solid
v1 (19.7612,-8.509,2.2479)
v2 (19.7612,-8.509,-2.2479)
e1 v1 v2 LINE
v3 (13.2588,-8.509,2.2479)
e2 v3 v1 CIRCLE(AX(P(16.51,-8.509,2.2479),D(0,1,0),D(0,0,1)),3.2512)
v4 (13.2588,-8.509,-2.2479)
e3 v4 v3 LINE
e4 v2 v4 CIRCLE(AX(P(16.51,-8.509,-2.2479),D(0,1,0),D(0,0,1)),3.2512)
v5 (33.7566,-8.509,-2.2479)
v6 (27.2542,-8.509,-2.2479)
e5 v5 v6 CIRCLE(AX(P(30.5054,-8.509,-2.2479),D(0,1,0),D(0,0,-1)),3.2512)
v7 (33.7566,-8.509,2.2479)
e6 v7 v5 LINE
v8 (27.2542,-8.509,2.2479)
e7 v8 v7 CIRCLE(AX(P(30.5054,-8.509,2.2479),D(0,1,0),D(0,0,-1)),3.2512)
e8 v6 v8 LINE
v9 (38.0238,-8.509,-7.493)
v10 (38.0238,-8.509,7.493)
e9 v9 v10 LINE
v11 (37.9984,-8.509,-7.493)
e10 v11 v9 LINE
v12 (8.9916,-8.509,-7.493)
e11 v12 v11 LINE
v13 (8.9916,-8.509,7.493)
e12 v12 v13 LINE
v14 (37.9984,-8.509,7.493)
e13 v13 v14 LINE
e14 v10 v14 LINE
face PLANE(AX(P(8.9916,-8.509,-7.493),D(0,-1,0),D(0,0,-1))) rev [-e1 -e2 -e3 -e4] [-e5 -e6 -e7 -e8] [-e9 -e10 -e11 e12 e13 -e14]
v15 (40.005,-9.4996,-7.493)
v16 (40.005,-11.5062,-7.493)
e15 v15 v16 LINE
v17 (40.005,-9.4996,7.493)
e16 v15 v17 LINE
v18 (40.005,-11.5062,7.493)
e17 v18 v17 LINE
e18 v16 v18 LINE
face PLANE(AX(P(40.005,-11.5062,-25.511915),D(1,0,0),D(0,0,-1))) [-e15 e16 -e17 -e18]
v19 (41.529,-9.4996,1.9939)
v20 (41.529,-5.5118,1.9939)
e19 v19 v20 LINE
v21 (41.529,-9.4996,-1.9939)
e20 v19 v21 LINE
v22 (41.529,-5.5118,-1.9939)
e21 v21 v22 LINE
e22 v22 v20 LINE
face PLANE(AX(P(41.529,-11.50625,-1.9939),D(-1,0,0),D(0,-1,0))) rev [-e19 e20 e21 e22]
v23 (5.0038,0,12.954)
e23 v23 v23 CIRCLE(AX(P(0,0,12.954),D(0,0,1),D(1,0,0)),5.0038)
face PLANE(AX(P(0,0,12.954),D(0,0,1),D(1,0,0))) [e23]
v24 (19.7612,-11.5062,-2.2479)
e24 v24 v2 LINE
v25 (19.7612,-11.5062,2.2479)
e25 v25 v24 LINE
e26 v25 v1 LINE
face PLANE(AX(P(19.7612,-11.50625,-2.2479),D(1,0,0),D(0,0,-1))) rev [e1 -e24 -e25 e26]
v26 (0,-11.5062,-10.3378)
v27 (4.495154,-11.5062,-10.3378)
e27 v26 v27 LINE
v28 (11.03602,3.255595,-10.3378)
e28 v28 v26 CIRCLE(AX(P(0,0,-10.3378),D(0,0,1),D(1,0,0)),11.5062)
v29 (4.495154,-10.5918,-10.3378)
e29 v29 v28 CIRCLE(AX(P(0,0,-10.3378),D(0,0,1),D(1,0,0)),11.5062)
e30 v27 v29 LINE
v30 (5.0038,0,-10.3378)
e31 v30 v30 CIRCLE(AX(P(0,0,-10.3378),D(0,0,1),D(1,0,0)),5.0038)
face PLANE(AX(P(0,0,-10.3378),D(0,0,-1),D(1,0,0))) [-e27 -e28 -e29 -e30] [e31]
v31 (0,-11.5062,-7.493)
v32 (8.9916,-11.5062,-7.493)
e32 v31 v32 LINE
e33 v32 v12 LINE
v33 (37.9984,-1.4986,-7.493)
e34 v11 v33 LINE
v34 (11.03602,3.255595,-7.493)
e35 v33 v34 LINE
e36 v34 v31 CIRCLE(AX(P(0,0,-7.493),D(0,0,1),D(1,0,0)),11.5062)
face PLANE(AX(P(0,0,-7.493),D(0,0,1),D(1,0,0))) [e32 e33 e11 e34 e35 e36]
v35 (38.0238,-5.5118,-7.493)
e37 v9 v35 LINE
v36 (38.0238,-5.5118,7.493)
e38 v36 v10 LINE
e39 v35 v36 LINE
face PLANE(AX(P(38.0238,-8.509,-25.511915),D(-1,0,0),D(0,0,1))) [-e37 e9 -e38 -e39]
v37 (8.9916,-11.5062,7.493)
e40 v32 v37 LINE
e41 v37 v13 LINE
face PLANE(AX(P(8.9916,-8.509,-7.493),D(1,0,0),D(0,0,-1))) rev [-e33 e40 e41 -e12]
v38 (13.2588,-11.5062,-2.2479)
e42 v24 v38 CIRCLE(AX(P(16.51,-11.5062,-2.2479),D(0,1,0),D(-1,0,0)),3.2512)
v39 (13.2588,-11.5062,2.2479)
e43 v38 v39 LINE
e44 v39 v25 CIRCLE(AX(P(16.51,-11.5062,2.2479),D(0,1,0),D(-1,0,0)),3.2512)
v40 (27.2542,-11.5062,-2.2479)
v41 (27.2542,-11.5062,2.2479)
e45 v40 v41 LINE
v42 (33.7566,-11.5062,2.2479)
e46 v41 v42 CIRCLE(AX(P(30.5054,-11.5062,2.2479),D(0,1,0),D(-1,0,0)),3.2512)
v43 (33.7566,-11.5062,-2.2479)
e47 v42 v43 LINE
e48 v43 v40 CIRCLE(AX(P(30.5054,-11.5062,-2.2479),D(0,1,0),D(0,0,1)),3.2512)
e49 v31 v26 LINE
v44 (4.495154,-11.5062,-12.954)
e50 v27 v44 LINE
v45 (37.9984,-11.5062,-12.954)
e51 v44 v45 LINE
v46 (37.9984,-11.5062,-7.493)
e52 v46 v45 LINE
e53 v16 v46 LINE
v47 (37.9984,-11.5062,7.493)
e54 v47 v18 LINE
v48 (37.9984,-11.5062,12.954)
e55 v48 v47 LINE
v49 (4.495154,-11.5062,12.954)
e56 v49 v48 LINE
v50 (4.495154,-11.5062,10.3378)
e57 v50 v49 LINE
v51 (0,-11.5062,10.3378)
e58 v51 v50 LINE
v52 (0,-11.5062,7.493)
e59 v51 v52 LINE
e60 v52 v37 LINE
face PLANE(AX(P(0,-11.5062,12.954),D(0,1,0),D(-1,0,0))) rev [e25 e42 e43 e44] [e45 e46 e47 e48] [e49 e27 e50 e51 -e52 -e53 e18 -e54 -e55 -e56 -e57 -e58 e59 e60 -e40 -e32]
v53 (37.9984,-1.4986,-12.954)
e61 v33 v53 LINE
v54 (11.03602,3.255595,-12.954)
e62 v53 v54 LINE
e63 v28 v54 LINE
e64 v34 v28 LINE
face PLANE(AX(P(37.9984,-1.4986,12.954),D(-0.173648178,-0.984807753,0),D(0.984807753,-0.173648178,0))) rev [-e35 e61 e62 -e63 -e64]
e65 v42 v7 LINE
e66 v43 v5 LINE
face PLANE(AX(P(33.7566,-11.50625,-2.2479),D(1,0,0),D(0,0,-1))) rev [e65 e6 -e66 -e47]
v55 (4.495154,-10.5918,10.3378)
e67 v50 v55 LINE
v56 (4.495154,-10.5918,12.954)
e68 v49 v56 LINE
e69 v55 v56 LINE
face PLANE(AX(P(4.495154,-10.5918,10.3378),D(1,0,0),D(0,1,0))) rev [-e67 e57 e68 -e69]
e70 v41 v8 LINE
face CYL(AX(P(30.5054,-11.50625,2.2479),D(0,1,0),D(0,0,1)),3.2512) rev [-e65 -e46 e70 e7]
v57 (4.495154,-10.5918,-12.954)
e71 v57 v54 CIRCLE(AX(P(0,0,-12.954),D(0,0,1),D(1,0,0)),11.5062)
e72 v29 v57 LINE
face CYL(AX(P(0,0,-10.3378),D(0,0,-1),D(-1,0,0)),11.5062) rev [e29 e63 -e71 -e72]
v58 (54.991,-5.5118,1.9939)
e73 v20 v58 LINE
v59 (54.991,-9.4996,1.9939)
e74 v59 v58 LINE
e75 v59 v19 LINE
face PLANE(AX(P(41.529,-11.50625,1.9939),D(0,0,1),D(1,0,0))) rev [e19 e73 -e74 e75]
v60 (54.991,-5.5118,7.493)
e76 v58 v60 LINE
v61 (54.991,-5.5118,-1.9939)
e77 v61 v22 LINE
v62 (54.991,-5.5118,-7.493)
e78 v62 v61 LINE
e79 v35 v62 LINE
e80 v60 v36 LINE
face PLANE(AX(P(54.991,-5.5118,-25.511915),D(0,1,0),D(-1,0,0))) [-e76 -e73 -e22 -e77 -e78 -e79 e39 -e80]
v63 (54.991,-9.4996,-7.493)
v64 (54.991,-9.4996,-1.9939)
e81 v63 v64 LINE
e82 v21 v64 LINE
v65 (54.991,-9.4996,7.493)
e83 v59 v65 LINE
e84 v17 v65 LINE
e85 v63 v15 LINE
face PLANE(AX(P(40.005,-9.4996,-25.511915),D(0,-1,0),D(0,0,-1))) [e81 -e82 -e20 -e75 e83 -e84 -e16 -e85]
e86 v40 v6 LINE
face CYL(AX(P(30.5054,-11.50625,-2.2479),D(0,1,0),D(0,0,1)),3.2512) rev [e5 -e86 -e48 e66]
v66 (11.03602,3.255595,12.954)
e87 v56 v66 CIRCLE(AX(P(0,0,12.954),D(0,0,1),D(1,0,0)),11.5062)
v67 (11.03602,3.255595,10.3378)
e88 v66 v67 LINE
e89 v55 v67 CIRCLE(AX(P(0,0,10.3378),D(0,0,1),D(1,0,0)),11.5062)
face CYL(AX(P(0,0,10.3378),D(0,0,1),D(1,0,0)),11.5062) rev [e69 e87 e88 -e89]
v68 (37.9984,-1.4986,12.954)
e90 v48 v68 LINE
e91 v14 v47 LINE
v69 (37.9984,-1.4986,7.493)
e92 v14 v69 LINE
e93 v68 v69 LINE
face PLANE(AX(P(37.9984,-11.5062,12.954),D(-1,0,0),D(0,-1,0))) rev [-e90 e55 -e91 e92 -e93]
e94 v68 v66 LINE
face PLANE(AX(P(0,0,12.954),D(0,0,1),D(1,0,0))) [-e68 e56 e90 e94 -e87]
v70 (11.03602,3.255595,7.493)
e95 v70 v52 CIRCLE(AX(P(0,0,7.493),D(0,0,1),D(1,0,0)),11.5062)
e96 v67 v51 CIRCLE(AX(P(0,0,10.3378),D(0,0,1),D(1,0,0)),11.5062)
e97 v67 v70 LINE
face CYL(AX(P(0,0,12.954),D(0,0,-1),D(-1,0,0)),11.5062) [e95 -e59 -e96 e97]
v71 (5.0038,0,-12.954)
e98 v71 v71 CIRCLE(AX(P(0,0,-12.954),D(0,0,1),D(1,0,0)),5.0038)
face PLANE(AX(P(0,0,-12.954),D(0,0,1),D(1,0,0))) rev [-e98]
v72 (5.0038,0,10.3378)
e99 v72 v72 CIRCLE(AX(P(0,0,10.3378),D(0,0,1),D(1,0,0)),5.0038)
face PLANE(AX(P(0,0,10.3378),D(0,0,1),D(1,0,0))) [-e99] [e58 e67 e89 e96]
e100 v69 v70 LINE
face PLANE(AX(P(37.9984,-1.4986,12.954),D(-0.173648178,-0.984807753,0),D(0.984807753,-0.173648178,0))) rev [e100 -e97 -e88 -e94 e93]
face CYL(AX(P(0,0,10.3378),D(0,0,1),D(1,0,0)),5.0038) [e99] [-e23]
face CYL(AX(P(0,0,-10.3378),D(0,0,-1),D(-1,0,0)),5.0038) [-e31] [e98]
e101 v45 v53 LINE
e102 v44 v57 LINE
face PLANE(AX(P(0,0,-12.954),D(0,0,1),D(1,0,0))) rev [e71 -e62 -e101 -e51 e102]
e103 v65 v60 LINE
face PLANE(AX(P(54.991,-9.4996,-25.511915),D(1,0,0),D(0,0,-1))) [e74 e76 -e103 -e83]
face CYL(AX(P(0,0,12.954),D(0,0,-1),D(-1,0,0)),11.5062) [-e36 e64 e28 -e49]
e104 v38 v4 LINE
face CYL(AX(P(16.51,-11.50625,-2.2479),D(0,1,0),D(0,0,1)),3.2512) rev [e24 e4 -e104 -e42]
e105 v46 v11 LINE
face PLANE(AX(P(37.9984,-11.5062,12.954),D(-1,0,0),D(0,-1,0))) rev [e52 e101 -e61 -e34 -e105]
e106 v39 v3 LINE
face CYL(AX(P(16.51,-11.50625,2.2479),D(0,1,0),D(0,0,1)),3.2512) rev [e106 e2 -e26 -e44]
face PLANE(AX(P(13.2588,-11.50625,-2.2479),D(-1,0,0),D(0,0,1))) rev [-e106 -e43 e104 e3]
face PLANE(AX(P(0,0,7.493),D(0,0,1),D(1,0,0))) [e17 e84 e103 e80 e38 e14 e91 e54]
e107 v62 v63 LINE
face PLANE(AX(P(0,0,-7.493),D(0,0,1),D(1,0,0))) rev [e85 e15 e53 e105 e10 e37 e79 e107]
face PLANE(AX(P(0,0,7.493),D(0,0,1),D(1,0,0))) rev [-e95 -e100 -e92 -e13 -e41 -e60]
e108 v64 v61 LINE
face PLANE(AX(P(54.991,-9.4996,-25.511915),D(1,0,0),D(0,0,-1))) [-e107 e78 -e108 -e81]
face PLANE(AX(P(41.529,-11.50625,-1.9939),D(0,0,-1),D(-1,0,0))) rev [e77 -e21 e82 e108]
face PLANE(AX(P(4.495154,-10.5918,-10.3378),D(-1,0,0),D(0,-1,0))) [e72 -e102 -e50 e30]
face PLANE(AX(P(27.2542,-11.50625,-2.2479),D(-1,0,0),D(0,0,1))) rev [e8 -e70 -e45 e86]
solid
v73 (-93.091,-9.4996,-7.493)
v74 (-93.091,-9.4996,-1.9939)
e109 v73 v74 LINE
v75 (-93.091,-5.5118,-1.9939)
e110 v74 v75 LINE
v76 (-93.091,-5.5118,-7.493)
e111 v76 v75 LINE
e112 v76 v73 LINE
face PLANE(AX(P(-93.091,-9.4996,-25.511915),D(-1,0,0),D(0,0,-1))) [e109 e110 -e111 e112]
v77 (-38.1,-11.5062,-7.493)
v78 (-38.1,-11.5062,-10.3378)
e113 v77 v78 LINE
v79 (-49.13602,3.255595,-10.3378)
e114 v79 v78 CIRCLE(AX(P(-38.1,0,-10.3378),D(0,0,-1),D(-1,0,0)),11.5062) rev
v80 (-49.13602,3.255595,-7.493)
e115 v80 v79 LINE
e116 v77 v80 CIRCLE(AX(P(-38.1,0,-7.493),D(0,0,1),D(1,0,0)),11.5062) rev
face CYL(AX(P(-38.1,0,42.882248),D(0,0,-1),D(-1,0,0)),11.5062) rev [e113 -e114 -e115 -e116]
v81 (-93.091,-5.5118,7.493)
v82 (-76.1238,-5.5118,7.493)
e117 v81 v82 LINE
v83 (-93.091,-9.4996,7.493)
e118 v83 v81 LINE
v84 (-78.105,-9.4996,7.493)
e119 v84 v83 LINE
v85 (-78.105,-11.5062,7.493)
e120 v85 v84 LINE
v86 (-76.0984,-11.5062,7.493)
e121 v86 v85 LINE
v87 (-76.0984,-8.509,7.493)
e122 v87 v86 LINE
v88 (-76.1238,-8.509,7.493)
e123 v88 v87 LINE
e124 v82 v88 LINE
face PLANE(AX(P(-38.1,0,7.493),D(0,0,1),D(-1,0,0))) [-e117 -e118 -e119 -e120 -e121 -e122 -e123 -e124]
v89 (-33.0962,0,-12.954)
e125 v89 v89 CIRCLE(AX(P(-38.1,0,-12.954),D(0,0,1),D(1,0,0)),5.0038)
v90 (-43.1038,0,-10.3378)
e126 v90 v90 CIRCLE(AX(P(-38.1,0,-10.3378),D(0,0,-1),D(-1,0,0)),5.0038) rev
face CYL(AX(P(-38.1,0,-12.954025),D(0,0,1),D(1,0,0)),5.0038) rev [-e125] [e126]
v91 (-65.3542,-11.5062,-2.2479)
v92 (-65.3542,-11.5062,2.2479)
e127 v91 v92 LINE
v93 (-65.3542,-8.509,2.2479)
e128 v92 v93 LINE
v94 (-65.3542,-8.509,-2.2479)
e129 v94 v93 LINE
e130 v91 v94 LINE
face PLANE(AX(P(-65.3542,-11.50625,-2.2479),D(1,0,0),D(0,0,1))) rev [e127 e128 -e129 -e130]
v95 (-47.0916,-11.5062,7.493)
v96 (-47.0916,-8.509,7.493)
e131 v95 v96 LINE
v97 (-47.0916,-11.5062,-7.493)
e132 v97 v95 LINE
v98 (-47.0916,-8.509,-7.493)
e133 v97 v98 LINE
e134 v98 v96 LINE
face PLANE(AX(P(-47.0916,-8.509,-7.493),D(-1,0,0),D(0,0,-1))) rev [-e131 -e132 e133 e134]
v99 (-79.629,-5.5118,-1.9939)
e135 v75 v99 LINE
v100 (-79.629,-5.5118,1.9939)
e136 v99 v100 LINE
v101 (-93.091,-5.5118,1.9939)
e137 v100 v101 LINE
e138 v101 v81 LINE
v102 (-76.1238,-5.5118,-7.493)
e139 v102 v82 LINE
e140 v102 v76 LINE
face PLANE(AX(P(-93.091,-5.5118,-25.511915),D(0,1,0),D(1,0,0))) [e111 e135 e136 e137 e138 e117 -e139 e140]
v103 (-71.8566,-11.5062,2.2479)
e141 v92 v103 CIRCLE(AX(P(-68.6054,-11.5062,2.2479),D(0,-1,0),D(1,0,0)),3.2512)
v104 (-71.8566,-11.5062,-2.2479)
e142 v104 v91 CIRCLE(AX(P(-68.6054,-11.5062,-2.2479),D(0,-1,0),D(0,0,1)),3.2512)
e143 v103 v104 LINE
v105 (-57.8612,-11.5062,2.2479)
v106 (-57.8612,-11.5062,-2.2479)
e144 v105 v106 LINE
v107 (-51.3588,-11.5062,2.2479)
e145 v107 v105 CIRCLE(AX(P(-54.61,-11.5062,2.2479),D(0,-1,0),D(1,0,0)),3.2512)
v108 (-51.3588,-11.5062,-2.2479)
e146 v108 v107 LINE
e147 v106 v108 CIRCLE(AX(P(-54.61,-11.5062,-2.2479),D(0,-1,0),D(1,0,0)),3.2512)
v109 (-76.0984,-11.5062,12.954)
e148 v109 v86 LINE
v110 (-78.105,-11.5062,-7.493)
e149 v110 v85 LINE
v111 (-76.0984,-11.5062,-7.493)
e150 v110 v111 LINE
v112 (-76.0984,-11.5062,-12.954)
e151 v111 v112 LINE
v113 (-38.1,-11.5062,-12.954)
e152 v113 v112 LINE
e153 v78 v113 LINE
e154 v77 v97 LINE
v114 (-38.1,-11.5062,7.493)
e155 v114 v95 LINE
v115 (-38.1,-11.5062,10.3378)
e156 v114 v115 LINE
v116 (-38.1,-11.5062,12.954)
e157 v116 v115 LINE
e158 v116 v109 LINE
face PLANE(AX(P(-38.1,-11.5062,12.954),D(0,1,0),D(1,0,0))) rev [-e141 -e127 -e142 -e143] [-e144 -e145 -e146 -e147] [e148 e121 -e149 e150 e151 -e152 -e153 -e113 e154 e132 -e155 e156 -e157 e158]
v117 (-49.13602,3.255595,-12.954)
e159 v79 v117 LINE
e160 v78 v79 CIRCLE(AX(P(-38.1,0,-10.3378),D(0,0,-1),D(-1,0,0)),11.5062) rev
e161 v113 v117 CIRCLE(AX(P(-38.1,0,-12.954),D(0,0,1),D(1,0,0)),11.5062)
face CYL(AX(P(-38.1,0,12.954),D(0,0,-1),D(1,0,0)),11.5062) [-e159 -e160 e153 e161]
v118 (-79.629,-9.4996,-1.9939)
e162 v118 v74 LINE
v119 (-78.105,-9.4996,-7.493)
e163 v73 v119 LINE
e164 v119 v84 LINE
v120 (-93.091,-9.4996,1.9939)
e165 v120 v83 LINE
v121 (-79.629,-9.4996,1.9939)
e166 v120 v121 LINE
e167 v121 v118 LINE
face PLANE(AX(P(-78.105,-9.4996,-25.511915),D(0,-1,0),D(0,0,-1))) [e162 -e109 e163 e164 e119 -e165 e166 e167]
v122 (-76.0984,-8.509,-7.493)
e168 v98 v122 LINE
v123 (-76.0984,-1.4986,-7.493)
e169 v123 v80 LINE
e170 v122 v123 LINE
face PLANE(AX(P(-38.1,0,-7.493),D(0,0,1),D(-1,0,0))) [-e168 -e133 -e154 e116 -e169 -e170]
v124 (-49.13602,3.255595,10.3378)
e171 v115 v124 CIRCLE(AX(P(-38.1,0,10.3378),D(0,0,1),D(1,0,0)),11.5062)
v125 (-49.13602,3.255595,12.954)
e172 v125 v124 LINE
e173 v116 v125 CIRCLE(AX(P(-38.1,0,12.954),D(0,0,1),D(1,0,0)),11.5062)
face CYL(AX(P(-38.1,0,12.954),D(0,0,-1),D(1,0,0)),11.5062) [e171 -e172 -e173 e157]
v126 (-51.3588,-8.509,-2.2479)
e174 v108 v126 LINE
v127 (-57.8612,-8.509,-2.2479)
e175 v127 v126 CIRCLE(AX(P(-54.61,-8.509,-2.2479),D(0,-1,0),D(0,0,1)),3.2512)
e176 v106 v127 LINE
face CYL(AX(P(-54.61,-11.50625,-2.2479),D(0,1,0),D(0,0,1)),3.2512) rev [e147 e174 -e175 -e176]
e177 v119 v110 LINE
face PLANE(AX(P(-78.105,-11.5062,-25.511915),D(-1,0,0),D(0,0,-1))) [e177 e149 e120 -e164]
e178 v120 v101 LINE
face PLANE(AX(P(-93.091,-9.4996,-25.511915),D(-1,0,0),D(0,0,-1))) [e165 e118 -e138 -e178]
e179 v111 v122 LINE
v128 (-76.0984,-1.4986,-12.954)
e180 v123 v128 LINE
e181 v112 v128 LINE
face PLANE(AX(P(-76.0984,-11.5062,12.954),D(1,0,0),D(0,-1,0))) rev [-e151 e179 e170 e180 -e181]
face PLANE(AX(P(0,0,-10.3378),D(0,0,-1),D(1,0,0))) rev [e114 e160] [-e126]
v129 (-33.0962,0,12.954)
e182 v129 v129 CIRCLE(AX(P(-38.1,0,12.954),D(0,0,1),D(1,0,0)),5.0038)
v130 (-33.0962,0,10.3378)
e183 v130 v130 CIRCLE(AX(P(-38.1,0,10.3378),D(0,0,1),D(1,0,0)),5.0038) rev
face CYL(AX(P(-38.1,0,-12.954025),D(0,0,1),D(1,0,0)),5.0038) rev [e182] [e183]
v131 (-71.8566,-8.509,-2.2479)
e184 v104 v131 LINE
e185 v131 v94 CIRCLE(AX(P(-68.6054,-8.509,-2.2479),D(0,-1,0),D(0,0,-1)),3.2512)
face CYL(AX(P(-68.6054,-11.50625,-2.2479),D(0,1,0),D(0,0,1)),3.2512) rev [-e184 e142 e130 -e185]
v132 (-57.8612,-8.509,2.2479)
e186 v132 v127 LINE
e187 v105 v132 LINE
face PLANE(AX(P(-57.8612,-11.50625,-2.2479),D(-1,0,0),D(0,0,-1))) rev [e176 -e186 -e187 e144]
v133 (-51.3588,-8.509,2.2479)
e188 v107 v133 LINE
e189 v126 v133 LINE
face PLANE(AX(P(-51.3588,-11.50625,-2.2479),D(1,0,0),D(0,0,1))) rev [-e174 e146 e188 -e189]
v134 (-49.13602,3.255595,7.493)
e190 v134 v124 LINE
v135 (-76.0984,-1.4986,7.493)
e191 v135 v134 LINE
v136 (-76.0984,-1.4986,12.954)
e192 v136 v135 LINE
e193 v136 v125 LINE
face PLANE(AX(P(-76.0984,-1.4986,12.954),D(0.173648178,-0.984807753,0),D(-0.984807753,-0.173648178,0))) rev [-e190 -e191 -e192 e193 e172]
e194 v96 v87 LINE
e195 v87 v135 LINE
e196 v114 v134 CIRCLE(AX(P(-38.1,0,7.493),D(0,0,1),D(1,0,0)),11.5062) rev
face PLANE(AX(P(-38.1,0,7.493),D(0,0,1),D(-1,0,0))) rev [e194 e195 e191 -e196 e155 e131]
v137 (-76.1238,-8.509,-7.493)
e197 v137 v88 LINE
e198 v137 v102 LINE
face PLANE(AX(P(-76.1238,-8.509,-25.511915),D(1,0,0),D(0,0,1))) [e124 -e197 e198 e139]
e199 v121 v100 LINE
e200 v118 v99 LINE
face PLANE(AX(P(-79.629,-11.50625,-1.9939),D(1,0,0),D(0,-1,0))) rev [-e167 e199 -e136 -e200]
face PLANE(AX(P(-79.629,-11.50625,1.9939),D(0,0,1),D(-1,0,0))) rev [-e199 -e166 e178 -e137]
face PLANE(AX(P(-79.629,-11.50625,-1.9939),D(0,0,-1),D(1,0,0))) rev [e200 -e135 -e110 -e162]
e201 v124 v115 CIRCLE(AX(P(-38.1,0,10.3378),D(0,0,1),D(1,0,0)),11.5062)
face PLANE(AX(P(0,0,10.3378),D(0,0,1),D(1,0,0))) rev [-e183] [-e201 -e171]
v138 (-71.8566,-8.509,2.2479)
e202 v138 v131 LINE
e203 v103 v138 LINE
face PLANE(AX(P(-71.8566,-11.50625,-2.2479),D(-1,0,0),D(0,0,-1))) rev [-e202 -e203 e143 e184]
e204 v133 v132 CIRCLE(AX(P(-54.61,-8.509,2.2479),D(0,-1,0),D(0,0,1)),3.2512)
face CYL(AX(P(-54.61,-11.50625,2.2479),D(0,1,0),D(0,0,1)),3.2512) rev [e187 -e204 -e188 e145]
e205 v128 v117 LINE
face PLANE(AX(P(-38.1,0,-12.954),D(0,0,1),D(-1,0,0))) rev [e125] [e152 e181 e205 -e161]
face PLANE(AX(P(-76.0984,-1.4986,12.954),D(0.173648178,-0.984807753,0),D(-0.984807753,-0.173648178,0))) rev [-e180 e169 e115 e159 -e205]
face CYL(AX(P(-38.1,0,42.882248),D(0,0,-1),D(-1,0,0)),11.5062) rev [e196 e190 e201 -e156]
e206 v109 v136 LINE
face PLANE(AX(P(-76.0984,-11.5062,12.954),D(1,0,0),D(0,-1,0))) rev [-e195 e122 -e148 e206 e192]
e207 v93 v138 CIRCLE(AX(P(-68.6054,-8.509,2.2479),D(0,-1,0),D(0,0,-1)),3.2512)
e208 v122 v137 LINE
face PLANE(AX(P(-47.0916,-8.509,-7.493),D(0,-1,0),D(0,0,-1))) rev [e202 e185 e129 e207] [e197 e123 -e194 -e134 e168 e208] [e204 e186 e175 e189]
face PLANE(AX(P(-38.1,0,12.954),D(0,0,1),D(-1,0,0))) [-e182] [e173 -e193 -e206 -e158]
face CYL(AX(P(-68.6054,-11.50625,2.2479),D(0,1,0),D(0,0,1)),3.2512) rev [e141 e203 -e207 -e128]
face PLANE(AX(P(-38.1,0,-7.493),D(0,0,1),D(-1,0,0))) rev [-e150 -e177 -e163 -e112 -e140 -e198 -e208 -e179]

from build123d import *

# Parameters (mm, degrees)
EXTRUDE1_DEPTH             = 12.954
SKETCH3_R                  = 5.0038
CUT_EXTRUDE1_DEPTH         = 2.6162
CUT_EXTRUDE2_DEPTH         = 7.493
EXTRUDE2_REACH             = 43.762
EXTRUDE2_DIRECTION_2_REACH = 43.762
SKETCH7_W                  = 13.462
SKETCH7_H                  = 3.9878
CUT_EXTRUDE3_DEPTH         = 60.003631422
CUT_EXTRUDE4_DEPTH         = 60.936836987
EXTRUDE3_OUTLINE_R         = 5.0038
EXTRUDE3_DEPTH             = 2.6162
EXTRUDE4_DEPTH             = 2.6162
SKETCH9_R                  = 5.0038
CUT_EXTRUDE5_DEPTH         = 98.311619982
CUT_EXTRUDE6_START         = -10.3378
SKETCH12_R                 = 11.5062
CUT_EXTRUDE6_DEPTH         = 20.6756


# Read off the part's stored shape, not the designer's step: Extrude3
with BuildPart() as part:
    # Sketch2 → Extrude1 (new, symmetric)
    with BuildSketch(Plane.XY):
        with BuildLine():
            Line((37.9984, -11.5062), (37.9984, -1.4986))
            Line((37.9984, -1.4986), (11.036020087, 3.255595043))
            ThreePointArc((11.036020087, 3.255595043), (-9.215534877, 6.889597621), (0, -11.5062))
            Line((0, -11.5062), (37.9984, -11.5062))
        make_face()
    extrude(amount=EXTRUDE1_DEPTH, both=True)

    # Sketch3 → Cut-Extrude1 (cut)
    with BuildSketch(Plane.XY.offset(12.954)):
        with BuildLine():
            Line((0, -11.5062), (4.495154191, -11.5062))
            Line((4.495154191, -11.5062), (4.495154191, -10.5918))
            ThreePointArc((4.495154191, -10.5918), (-2.293607342, 11.27528287), (0, -11.5062))
        make_face()
        Circle(SKETCH3_R, mode=Mode.SUBTRACT)
    cut_extrude1 = extrude(amount=-CUT_EXTRUDE1_DEPTH, mode=Mode.SUBTRACT)

    # Mirror1: Cut-Extrude1 across plane
    add(cut_extrude1.mirror(Plane.XY), mode=Mode.SUBTRACT)

    # Sketch4 → Cut-Extrude2 (cut, symmetric)
    with BuildSketch(Plane.XY):
        with BuildLine():
            Line((8.9916, -8.509), (37.9984, -8.509))
            Line((37.9984, -8.509), (37.9984, -1.4986))
            Line((37.9984, -1.4986), (11.036020087, 3.255595043))
            ThreePointArc((11.036020087, 3.255595043), (-9.215534877, 6.889597621), (0, -11.5062))
            Line((0, -11.5062), (8.9916, -11.5062))
            Line((8.9916, -11.5062), (8.9916, -8.509))
        make_face()
    extrude(amount=CUT_EXTRUDE2_DEPTH, both=True, mode=Mode.SUBTRACT)

    # Extrude2: up to this face of the body (flat: up to its plane)
    extrude2_end = Plane(part.part.faces().sort_by_distance((8.815484891, -1.610467544, -7.493))[0])
    # Sketch5 → Extrude2 (add, up to the picked face)
    with BuildSketch(Plane.XY, mode=Mode.PRIVATE) as extrude2_sk1:
        Polygon((54.991, -5.5118), (38.0238, -5.5118), (38.0238, -8.509), (37.9984, -8.509), (37.9984, -11.5062), (40.005, -11.5062), (40.005, -9.4996), (54.991, -9.4996), align=None)
    extrude2_tool1 = split(extrude(extrude2_sk1.sketch, amount=-EXTRUDE2_REACH, mode=Mode.PRIVATE), bisect_by=extrude2_end, keep=Keep.BOTH, mode=Mode.PRIVATE)
    add(extrude2_tool1.solids().sort_by(Axis((46.083002, -7.674508, 0), (0, 0, -1)))[0])

    # Extrude2 direction 2: up to this face of the body (flat: up to its plane)
    extrude2_direction_2_end = Plane(part.part.faces().sort_by_distance((8.815484891, -1.610467544, 7.493))[0])
    # Sketch5 → Extrude2 direction 2 (add, up to the picked face)
    with BuildSketch(Plane.XY, mode=Mode.PRIVATE) as extrude2_direction_2_sk1:
        Polygon((54.991, -5.5118), (38.0238, -5.5118), (38.0238, -8.509), (37.9984, -8.509), (37.9984, -11.5062), (40.005, -11.5062), (40.005, -9.4996), (54.991, -9.4996), align=None)
    extrude2_direction_2_tool1 = split(extrude(extrude2_direction_2_sk1.sketch, amount=EXTRUDE2_DIRECTION_2_REACH, mode=Mode.PRIVATE), bisect_by=extrude2_direction_2_end, keep=Keep.BOTH, mode=Mode.PRIVATE)
    add(extrude2_direction_2_tool1.solids().sort_by(Axis((46.083002, -7.674508, 0), (0, 0, 1)))[0])

    # Sketch7 → Cut-Extrude3 (cut, through all)
    with BuildSketch(Plane(origin=(0, -5.5118, 0), x_dir=(1, 0, 0), z_dir=(0, 1, 0))):
        with Locations((48.26, 0)):
            Rectangle(SKETCH7_W, SKETCH7_H)
    extrude(amount=-CUT_EXTRUDE3_DEPTH, mode=Mode.SUBTRACT)

    # Sketch8 → Cut-Extrude4 (cut, through all)
    with BuildSketch(Plane(origin=(0, -8.509, 0), x_dir=(1, 0, 0), z_dir=(0, 1, 0))):
        with BuildLine():
            Line((19.7612, 2.2479), (19.7612, -2.2479))
            ThreePointArc((19.7612, -2.2479), (16.51, -5.4991), (13.2588, -2.2479))
            Line((13.2588, -2.2479), (13.2588, 2.2479))
            ThreePointArc((13.2588, 2.2479), (16.51, 5.4991), (19.7612, 2.2479))
        make_face()
        with BuildLine():
            Line((33.7566, 2.2479), (33.7566, -2.2479))
            ThreePointArc((33.7566, -2.2479), (30.5054, -5.4991), (27.2542, -2.2479))
            Line((27.2542, -2.2479), (27.2542, 2.2479))
            ThreePointArc((27.2542, 2.2479), (30.5054, 5.4991), (33.7566, 2.2479))
        make_face()
    extrude(amount=-CUT_EXTRUDE4_DEPTH, mode=Mode.SUBTRACT)


with BuildPart() as body_2:
    # Mirror3: mirrored copy
    add(part.part.mirror(Plane(origin=(-19.05, 0, 0), x_dir=(0, 0, 1), z_dir=(1, 0, 0))))

    # Extrude3 outline → Extrude3 (add)
    with BuildSketch(Plane.XY.offset(10.3378)):
        with BuildLine():
            ThreePointArc((-38.1, -11.5062), (-28.884465123, 6.889597621), (-49.136020087, 3.255595043))
            ThreePointArc((-49.136020087, 3.255595043), (-48.503938244, -4.91433693), (-42.595154191, -10.5918))
            Line((-42.595154191, -10.5918), (-42.595154191, -11.5062))
            Line((-42.595154191, -11.5062), (-38.1, -11.5062))
        make_face()
        with Locations((-38.1, 0)):
            Circle(EXTRUDE3_OUTLINE_R, mode=Mode.SUBTRACT)
    extrude(amount=EXTRUDE3_DEPTH)

    # Sketch11 → Extrude4 (add)
    with BuildSketch(Plane(origin=(0, 0, -10.3378), x_dir=(-1, 0, 0), z_dir=(0, 0, -1))):
        with BuildLine():
            Line((38.1, -11.5062), (42.595154191, -11.5062))
            Line((42.595154191, -11.5062), (42.595154191, -10.5918))
            ThreePointArc((42.595154191, -10.5918), (48.503938244, -4.91433693), (49.136020087, 3.255595043))
            ThreePointArc((49.136020087, 3.255595043), (28.884465123, 6.889597621), (38.1, -11.5062))
        make_face()
    extrude(amount=EXTRUDE4_DEPTH)

    # Sketch9 → Cut-Extrude5 (cut, through all)
    with BuildSketch(Plane.XY.offset(12.954)):
        with Locations((-38.1, 0)):
            Circle(SKETCH9_R)
    extrude(amount=-CUT_EXTRUDE5_DEPTH, mode=Mode.SUBTRACT)

    # Sketch12 → Cut-Extrude6 (cut)
    with BuildSketch(Plane.XY.offset(CUT_EXTRUDE6_START)):
        with Locations((-38.1, 0)):
            Circle(SKETCH12_R)
    extrude(amount=CUT_EXTRUDE6_DEPTH, mode=Mode.SUBTRACT)


solid = Compound([part.part, body_2.part])
